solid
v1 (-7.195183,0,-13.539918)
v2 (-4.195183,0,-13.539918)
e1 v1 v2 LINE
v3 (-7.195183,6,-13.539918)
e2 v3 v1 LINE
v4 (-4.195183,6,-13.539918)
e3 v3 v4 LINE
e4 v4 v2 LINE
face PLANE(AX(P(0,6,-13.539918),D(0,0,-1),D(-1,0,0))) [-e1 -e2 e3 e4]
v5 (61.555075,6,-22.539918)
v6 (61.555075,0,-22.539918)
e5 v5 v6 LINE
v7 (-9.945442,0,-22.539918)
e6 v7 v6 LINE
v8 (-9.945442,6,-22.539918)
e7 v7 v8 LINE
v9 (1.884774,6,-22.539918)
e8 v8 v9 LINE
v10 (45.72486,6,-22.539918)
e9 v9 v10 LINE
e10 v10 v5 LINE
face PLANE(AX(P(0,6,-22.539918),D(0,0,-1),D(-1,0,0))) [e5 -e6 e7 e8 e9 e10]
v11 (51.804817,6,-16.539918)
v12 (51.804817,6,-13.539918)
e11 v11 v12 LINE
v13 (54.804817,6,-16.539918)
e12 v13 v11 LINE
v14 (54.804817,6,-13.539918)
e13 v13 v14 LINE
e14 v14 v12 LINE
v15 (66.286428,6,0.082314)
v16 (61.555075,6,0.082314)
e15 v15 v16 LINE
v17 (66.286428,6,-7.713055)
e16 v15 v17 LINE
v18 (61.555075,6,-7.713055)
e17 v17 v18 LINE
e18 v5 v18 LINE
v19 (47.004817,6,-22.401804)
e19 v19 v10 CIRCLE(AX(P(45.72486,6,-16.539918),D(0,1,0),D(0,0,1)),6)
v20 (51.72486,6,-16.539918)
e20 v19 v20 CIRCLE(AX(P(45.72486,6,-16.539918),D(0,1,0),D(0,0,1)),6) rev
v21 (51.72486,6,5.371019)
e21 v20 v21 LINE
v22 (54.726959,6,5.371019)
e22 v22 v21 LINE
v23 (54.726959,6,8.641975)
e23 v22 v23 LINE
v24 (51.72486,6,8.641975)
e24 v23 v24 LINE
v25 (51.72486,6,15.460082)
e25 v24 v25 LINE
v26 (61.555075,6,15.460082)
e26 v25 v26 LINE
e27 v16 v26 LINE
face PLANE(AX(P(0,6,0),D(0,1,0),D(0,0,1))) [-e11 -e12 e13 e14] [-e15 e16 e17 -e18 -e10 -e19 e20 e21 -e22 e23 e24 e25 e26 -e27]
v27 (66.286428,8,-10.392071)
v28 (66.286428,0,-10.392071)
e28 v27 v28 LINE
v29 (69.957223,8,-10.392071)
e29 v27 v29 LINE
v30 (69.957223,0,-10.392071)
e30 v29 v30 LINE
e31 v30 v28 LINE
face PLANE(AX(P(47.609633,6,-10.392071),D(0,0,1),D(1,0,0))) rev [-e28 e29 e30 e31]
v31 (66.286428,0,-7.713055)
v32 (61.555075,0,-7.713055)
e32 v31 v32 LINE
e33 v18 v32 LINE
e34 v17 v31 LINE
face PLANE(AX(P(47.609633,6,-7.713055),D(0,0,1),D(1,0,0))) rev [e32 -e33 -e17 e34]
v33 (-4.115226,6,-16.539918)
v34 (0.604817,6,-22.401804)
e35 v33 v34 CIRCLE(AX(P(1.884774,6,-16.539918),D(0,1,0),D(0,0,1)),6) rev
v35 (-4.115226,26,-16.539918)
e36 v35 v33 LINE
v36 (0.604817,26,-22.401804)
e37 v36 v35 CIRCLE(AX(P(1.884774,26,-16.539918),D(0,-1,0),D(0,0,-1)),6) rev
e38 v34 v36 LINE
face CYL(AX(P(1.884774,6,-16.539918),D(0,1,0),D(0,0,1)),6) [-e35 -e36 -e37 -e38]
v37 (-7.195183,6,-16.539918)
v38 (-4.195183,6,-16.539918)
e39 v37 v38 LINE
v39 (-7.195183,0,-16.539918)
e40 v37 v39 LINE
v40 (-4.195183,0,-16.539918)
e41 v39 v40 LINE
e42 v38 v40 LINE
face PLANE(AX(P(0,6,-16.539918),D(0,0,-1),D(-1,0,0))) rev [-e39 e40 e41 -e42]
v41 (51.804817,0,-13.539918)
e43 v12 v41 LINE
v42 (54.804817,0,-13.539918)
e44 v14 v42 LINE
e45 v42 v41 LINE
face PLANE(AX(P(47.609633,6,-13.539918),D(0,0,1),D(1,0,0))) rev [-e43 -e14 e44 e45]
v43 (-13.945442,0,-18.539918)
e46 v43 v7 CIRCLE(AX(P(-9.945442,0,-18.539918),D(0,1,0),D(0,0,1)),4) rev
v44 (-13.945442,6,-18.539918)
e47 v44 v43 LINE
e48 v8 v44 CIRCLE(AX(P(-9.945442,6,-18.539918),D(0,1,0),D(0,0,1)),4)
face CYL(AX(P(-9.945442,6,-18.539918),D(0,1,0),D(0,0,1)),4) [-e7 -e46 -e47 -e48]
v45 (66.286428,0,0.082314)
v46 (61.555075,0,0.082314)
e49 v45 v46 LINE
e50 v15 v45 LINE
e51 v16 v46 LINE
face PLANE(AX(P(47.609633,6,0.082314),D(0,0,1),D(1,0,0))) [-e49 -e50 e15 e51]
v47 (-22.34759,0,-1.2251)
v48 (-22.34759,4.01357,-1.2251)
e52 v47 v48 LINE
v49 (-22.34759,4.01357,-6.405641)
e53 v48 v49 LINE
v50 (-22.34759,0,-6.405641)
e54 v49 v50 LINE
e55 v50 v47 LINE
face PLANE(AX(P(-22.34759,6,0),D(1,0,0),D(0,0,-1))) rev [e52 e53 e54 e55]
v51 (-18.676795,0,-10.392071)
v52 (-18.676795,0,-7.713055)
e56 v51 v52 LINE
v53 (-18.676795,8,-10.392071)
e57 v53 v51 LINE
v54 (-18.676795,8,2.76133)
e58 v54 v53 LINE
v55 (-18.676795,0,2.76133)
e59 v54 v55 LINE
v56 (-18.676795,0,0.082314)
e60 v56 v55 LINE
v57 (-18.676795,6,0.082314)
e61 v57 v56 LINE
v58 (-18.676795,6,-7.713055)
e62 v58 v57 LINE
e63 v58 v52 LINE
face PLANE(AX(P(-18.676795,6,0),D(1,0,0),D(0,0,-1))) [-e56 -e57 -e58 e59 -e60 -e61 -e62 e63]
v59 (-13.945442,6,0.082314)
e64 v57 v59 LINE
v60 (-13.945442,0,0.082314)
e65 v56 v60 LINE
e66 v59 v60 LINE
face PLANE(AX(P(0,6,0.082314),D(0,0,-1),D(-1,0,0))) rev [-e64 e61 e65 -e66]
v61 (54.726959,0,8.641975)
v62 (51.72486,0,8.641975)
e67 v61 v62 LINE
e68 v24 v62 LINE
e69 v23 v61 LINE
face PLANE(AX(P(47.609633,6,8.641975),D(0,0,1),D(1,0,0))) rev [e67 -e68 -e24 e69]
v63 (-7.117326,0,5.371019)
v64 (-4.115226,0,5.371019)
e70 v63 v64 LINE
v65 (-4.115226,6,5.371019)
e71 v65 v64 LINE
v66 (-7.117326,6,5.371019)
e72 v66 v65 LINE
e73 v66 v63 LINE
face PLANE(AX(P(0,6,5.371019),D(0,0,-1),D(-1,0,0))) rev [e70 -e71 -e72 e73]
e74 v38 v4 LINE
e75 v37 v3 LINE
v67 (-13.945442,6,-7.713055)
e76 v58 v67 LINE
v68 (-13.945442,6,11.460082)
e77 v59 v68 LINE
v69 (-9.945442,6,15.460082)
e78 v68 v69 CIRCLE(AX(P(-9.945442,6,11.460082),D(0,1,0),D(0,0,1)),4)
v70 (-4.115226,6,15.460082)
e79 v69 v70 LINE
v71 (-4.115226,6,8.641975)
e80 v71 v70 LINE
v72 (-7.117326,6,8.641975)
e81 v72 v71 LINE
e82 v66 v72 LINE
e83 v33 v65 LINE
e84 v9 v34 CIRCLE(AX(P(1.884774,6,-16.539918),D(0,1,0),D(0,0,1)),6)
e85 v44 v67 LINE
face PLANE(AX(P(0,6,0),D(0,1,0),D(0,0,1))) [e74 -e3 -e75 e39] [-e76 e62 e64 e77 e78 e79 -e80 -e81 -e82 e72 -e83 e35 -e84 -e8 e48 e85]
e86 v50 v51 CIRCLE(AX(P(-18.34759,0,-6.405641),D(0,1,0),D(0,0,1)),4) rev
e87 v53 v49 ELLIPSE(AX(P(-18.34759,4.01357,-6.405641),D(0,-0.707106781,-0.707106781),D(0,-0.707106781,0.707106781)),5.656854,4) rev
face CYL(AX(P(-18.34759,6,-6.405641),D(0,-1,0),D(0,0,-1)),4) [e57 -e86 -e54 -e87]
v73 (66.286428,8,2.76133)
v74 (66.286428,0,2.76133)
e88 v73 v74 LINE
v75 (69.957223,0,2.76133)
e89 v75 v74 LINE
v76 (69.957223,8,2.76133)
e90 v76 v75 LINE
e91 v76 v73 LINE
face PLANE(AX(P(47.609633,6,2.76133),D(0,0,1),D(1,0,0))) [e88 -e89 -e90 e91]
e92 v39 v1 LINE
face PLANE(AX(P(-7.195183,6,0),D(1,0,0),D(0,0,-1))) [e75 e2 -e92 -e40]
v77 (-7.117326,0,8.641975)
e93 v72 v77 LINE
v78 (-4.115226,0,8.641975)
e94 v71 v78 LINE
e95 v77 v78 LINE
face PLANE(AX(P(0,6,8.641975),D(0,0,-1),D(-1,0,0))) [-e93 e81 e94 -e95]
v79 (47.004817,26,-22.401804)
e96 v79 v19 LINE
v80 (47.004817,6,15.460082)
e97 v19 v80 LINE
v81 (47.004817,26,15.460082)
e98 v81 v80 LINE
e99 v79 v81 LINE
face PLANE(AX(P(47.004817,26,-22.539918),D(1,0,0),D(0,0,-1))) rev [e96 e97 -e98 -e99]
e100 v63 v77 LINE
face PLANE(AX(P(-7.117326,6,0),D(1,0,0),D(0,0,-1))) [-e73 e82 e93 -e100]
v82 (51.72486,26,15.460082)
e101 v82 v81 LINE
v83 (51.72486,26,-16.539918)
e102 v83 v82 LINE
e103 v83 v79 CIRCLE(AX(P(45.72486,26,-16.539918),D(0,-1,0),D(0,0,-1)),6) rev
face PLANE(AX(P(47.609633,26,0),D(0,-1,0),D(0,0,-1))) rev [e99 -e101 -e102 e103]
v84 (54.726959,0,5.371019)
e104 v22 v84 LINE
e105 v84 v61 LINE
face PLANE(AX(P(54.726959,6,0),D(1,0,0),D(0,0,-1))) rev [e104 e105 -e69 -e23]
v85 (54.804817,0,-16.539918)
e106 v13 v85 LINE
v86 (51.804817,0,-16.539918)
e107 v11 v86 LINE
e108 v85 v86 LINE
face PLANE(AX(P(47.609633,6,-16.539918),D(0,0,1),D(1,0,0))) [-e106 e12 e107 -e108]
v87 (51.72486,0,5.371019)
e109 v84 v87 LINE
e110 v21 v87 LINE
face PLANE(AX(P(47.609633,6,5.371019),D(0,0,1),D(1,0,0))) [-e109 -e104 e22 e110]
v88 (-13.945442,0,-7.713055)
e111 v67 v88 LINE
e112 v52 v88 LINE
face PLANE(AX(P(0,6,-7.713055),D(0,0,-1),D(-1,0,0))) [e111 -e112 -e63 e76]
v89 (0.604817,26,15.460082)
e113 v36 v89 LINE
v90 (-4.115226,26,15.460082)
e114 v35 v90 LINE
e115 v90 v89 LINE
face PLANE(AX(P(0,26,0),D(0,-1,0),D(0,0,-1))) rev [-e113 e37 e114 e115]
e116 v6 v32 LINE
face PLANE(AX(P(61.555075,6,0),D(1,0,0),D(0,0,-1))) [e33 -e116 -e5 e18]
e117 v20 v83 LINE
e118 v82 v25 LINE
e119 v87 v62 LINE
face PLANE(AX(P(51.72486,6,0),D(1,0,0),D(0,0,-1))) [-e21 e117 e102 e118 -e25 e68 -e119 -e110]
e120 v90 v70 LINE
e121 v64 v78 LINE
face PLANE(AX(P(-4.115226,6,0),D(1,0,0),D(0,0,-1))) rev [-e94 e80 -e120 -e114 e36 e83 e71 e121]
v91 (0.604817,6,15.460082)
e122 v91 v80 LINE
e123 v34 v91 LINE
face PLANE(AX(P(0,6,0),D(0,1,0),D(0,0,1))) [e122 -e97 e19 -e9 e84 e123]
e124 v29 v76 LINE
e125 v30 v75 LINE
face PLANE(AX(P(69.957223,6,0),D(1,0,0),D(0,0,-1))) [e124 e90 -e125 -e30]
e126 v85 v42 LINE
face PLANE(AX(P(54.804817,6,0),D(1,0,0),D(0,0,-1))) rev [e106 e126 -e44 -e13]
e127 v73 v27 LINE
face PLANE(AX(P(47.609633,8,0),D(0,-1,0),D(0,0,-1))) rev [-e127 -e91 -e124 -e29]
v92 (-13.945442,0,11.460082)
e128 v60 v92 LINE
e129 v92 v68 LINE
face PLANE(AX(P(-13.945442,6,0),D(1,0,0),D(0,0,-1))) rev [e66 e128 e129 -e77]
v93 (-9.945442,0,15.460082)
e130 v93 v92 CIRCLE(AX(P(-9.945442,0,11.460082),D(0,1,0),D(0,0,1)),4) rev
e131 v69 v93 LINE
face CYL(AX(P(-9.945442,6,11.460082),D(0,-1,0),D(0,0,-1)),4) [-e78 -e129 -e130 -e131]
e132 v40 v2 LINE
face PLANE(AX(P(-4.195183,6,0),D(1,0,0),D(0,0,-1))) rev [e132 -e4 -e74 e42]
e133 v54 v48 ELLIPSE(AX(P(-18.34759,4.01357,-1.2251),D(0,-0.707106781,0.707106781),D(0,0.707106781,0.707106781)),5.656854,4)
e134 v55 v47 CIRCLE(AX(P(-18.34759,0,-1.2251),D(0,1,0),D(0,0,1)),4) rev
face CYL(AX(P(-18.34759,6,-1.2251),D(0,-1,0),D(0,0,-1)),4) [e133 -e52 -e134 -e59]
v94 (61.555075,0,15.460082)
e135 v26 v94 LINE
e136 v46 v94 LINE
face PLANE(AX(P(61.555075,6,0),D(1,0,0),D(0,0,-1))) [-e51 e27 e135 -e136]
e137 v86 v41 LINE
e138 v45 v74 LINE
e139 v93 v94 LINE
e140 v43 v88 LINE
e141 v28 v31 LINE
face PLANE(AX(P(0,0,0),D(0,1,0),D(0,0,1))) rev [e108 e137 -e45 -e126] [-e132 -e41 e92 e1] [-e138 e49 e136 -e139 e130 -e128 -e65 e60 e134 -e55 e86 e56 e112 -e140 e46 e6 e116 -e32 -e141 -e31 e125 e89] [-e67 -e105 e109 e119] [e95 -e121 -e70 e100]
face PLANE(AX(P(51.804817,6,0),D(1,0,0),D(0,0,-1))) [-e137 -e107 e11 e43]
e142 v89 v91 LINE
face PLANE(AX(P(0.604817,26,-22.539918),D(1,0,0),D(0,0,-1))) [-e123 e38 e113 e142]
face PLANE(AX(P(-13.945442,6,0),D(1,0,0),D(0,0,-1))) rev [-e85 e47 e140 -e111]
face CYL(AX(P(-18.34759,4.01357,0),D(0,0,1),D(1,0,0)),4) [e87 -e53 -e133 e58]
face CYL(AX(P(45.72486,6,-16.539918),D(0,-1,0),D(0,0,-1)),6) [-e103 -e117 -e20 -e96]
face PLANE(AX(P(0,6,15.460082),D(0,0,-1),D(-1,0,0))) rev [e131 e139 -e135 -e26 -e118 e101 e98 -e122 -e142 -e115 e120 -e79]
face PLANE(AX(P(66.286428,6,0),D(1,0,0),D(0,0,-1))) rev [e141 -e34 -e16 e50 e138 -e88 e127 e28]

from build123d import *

# Parameters (mm, degrees)
SKETCH1_W           = 37.75025884
SKETCH1_H           = 38
SKETCH1_W_2         = 3
SKETCH1_H_2         = 3
SKETCH1_W_3         = 3.002099817
SKETCH1_H_3         = 3.270956242
SKETCH1_W_4         = 4.73135243
SKETCH1_H_4         = 7.795369176
BOSS_EXTRUDE1_DEPTH = 6
SKETCH2_W           = 4.72004293
SKETCH2_H           = 38
BOSS_EXTRUDE2_DEPTH = 20
FILLET1_R           = 6
SKETCH3_W           = 3.670795438
SKETCH3_H           = 13.153400434
BOSS_EXTRUDE3_DEPTH = 2
MIRROR1_OUTLINE_W   = 3.002099816
MIRROR1_OUTLINE_H   = 3.270956242
MIRROR1_OUTLINE_W_2 = 3
MIRROR1_OUTLINE_H_2 = 3
MIRROR1_DEPTH       = 6
MIRROR1_START       = 6
MIRROR1_2_DEPTH     = 20
MIRROR1_3_OUTLINE_W = 3.670795437
MIRROR1_3_OUTLINE_H = 13.153400434
MIRROR1_3_DEPTH     = 2
FILLET2_R           = 4


# Read off the part's stored shape, not the designer's step: Mirror1
with BuildPart() as part:
    # Sketch1 → Boss-Extrude1 (new body)
    # profile 1 of 3: a face of its own
    with BuildSketch(Plane(origin=(0, 0, 0), x_dir=(1, 0, 0), z_dir=(0, 1, 0))):
        with Locations((4.929687173, 3.539918032)):
            Rectangle(SKETCH1_W, SKETCH1_H)
        with Locations((-5.695183407, 15.039918032)):
            Rectangle(SKETCH1_W_2, SKETCH1_H_2, mode=Mode.SUBTRACT)
        with Locations((-5.616276245, -7.006497188)):
            Rectangle(SKETCH1_W_3, SKETCH1_H_3, mode=Mode.SUBTRACT)
    # profile 2 of 3: a face of its own
    with BuildSketch(Plane(origin=(0, 0, 0), x_dir=(1, 0, 0), z_dir=(0, 1, 0))):
        with Locations((-16.311118462, 3.815370554)):
            Rectangle(SKETCH1_W_4, SKETCH1_H_4)
    # profile 3 of 3: a face of its own
    with BuildSketch(Plane(origin=(0, 0, 0), x_dir=(1, 0, 0), z_dir=(0, 1, 0))):
        Polygon((-18.676794677, -0.082314034), (-18.676794677, 7.713055142), (-18.676794677, 10.392070771), (-22.347590115, 10.392070771), (-22.347590115, -2.761329663), (-18.676794677, -2.761329663), align=None)
    extrude(amount=BOSS_EXTRUDE1_DEPTH)

    # Sketch2 → Boss-Extrude2 (add)
    with BuildSketch(Plane(origin=(0, 6, 0), x_dir=(1, 0, 0), z_dir=(0, 1, 0))):
        with Locations((-1.755204872, 3.539918032)):
            Rectangle(SKETCH2_W, SKETCH2_H)
    extrude(amount=BOSS_EXTRUDE2_DEPTH)

    # Fillet1
    # the kernel refuses this fillet: 6 mm, written as the material it takes off along each edge
    with BuildSketch(Plane(origin=(-4.115226337, 6, -22.539918032), x_dir=(1, 0, 0), z_dir=(0, 1, 0))) as fillet1_piece_1:
        with BuildLine():
            CenterArc((FILLET1_R, -FILLET1_R), FILLET1_R, 90, 90)
            Line((0, -FILLET1_R), (0, 0))
            Line((0, 0), (FILLET1_R, 0))
        make_face()
    extrude(amount=35, mode=Mode.SUBTRACT)

    # Sketch3 → Boss-Extrude3 (add)
    with BuildSketch(Plane(origin=(0, 6, 0), x_dir=(1, 0, 0), z_dir=(0, 1, 0))):
        with Locations((-20.512192396, 3.815370554)):
            Rectangle(SKETCH3_W, SKETCH3_H)
    extrude(amount=BOSS_EXTRUDE3_DEPTH)

    # Mirror1 outline → Mirror1 (add)
    with BuildSketch(Plane(origin=(0, 0, 0), x_dir=(1, 0, 0), z_dir=(0, 1, 0))):
        Polygon((23.804816593, -15.460081968), (61.555075434, -15.460081968), (61.555075434, -0.082314034), (66.286427864, -0.082314034), (66.286427864, -2.761329663), (69.957223301, -2.761329663), (69.957223301, 10.392070771), (66.286427864, 10.392070771), (66.286427864, 7.713055142), (61.555075434, 7.713055142), (61.555075434, 22.539918032), (23.804816593, 22.539918032), align=None)
        with Locations((53.225909432, -7.006497188)):
            Rectangle(MIRROR1_OUTLINE_W, MIRROR1_OUTLINE_H, mode=Mode.SUBTRACT)
        with Locations((53.304816593, 15.039918032)):
            Rectangle(MIRROR1_OUTLINE_W_2, MIRROR1_OUTLINE_H_2, mode=Mode.SUBTRACT)
    extrude(amount=MIRROR1_DEPTH)

    # Mirror1 2 outline → Mirror1 2 (add)
    with BuildSketch(Plane(origin=(0, 0, 0), x_dir=(1, 0, 0), z_dir=(0, 1, 0)).offset(MIRROR1_START)):
        with BuildLine():
            Line((51.724859524, -15.460081968), (51.724859524, 16.539918032))
            ThreePointArc((51.724859524, 16.539918032), (50.398174323, 20.302912689), (47.004816593, 22.401804238))
            Line((47.004816593, 22.401804238), (47.004816593, -15.460081968))
            Line((47.004816593, -15.460081968), (51.724859524, -15.460081968))
        make_face()
    extrude(amount=MIRROR1_2_DEPTH)

    # Mirror1 3 outline → Mirror1 3 (add)
    with BuildSketch(Plane(origin=(0, 0, 0), x_dir=(1, 0, 0), z_dir=(0, 1, 0)).offset(MIRROR1_START)):
        with Locations((68.121825583, 3.815370554)):
            Rectangle(MIRROR1_3_OUTLINE_W, MIRROR1_3_OUTLINE_H)
    extrude(amount=MIRROR1_3_DEPTH)

    # Fillet2
    # the kernel refuses this fillet: 4 mm, written as the material it takes off along each edge
    with BuildSketch(Plane(origin=(-13.945442247, -10, 15.460081968), x_dir=(0, 0, -1), z_dir=(0, 1, 0)), Plane(origin=(-13.945442247, -10, -22.539918032), x_dir=(1, 0, 0), z_dir=(0, 1, 0))) as fillet2_piece_1:
        with BuildLine():
            CenterArc((FILLET2_R, -FILLET2_R), FILLET2_R, 90, 90)
            Line((0, -FILLET2_R), (-FILLET2_R * 0.02, -FILLET2_R))
            Line((-FILLET2_R * 0.02, -FILLET2_R), (-FILLET2_R * 0.02, FILLET2_R * 0.02))
            Line((-FILLET2_R * 0.02, FILLET2_R * 0.02), (FILLET2_R, FILLET2_R * 0.02))
            Line((FILLET2_R, FILLET2_R * 0.02), (FILLET2_R, 0))
        make_face()
    extrude(amount=26, mode=Mode.SUBTRACT)
    with BuildSketch(Plane(origin=(-22.347590115, 17.966075066, 2.761329663), x_dir=(0, 0, -1), z_dir=(0, -1, 0))) as fillet2_piece_2:
        with BuildLine():
            CenterArc((3.986430026, 4), FILLET2_R, 184.720847703, 85.279152297)
            Line((0, 3.670795437), (-0.079728601, 3.664211346))
            ThreePointArc((-0.079728601, 3.664211346), (-0.08, 1.835397719), (-0.08, 0))
            Line((-0.08, 0), (0, -0.08))
            Line((0, -0.08), (3.986430026, -0.08))
            Line((3.986430026, -0.08), (3.986430026, 0))
        make_face()
    extrude(amount=27.932150132, mode=Mode.SUBTRACT)
    with BuildSketch(Plane(origin=(-22.347590115, 8, -20.358145837), x_dir=(0, -1, 0), z_dir=(0, 0, 1))) as fillet2_piece_3:
        with BuildLine():
            CenterArc((3.986430026, 4), FILLET2_R, 184.720847703, 85.279152297)
            Line((0, 3.670795437), (-0.079728601, 3.664211346))
            ThreePointArc((-0.079728601, 3.664211346), (-0.08, 1.835397719), (-0.08, 0))
            Line((-0.08, 0), (0, -0.08))
            Line((0, -0.08), (3.986430026, -0.08))
            Line((3.986430026, -0.08), (3.986430026, 0))
        make_face()
    extrude(amount=33.085550566, mode=Mode.SUBTRACT)
    with BuildSketch(Plane(origin=(-22.347590115, -9.966075066, -10.392070771), x_dir=(1, 0, 0), z_dir=(0, 1, 0))) as fillet2_piece_4:
        with BuildLine():
            CenterArc((4, -3.986430026), FILLET2_R, 94.720847703, 85.279152297)
            Line((0, -3.986430026), (-0.08, -3.986430026))
            Line((-0.08, -3.986430026), (-0.08, 0))
            Line((-0.08, 0), (0, 0.08))
            ThreePointArc((0, 0.08), (1.835397719, 0.08), (3.664211346, 0.079728601))
            Line((3.664211346, 0.079728601), (3.670795437, 0))
        make_face()
    extrude(amount=27.932150132, mode=Mode.SUBTRACT)


solid = part.part
